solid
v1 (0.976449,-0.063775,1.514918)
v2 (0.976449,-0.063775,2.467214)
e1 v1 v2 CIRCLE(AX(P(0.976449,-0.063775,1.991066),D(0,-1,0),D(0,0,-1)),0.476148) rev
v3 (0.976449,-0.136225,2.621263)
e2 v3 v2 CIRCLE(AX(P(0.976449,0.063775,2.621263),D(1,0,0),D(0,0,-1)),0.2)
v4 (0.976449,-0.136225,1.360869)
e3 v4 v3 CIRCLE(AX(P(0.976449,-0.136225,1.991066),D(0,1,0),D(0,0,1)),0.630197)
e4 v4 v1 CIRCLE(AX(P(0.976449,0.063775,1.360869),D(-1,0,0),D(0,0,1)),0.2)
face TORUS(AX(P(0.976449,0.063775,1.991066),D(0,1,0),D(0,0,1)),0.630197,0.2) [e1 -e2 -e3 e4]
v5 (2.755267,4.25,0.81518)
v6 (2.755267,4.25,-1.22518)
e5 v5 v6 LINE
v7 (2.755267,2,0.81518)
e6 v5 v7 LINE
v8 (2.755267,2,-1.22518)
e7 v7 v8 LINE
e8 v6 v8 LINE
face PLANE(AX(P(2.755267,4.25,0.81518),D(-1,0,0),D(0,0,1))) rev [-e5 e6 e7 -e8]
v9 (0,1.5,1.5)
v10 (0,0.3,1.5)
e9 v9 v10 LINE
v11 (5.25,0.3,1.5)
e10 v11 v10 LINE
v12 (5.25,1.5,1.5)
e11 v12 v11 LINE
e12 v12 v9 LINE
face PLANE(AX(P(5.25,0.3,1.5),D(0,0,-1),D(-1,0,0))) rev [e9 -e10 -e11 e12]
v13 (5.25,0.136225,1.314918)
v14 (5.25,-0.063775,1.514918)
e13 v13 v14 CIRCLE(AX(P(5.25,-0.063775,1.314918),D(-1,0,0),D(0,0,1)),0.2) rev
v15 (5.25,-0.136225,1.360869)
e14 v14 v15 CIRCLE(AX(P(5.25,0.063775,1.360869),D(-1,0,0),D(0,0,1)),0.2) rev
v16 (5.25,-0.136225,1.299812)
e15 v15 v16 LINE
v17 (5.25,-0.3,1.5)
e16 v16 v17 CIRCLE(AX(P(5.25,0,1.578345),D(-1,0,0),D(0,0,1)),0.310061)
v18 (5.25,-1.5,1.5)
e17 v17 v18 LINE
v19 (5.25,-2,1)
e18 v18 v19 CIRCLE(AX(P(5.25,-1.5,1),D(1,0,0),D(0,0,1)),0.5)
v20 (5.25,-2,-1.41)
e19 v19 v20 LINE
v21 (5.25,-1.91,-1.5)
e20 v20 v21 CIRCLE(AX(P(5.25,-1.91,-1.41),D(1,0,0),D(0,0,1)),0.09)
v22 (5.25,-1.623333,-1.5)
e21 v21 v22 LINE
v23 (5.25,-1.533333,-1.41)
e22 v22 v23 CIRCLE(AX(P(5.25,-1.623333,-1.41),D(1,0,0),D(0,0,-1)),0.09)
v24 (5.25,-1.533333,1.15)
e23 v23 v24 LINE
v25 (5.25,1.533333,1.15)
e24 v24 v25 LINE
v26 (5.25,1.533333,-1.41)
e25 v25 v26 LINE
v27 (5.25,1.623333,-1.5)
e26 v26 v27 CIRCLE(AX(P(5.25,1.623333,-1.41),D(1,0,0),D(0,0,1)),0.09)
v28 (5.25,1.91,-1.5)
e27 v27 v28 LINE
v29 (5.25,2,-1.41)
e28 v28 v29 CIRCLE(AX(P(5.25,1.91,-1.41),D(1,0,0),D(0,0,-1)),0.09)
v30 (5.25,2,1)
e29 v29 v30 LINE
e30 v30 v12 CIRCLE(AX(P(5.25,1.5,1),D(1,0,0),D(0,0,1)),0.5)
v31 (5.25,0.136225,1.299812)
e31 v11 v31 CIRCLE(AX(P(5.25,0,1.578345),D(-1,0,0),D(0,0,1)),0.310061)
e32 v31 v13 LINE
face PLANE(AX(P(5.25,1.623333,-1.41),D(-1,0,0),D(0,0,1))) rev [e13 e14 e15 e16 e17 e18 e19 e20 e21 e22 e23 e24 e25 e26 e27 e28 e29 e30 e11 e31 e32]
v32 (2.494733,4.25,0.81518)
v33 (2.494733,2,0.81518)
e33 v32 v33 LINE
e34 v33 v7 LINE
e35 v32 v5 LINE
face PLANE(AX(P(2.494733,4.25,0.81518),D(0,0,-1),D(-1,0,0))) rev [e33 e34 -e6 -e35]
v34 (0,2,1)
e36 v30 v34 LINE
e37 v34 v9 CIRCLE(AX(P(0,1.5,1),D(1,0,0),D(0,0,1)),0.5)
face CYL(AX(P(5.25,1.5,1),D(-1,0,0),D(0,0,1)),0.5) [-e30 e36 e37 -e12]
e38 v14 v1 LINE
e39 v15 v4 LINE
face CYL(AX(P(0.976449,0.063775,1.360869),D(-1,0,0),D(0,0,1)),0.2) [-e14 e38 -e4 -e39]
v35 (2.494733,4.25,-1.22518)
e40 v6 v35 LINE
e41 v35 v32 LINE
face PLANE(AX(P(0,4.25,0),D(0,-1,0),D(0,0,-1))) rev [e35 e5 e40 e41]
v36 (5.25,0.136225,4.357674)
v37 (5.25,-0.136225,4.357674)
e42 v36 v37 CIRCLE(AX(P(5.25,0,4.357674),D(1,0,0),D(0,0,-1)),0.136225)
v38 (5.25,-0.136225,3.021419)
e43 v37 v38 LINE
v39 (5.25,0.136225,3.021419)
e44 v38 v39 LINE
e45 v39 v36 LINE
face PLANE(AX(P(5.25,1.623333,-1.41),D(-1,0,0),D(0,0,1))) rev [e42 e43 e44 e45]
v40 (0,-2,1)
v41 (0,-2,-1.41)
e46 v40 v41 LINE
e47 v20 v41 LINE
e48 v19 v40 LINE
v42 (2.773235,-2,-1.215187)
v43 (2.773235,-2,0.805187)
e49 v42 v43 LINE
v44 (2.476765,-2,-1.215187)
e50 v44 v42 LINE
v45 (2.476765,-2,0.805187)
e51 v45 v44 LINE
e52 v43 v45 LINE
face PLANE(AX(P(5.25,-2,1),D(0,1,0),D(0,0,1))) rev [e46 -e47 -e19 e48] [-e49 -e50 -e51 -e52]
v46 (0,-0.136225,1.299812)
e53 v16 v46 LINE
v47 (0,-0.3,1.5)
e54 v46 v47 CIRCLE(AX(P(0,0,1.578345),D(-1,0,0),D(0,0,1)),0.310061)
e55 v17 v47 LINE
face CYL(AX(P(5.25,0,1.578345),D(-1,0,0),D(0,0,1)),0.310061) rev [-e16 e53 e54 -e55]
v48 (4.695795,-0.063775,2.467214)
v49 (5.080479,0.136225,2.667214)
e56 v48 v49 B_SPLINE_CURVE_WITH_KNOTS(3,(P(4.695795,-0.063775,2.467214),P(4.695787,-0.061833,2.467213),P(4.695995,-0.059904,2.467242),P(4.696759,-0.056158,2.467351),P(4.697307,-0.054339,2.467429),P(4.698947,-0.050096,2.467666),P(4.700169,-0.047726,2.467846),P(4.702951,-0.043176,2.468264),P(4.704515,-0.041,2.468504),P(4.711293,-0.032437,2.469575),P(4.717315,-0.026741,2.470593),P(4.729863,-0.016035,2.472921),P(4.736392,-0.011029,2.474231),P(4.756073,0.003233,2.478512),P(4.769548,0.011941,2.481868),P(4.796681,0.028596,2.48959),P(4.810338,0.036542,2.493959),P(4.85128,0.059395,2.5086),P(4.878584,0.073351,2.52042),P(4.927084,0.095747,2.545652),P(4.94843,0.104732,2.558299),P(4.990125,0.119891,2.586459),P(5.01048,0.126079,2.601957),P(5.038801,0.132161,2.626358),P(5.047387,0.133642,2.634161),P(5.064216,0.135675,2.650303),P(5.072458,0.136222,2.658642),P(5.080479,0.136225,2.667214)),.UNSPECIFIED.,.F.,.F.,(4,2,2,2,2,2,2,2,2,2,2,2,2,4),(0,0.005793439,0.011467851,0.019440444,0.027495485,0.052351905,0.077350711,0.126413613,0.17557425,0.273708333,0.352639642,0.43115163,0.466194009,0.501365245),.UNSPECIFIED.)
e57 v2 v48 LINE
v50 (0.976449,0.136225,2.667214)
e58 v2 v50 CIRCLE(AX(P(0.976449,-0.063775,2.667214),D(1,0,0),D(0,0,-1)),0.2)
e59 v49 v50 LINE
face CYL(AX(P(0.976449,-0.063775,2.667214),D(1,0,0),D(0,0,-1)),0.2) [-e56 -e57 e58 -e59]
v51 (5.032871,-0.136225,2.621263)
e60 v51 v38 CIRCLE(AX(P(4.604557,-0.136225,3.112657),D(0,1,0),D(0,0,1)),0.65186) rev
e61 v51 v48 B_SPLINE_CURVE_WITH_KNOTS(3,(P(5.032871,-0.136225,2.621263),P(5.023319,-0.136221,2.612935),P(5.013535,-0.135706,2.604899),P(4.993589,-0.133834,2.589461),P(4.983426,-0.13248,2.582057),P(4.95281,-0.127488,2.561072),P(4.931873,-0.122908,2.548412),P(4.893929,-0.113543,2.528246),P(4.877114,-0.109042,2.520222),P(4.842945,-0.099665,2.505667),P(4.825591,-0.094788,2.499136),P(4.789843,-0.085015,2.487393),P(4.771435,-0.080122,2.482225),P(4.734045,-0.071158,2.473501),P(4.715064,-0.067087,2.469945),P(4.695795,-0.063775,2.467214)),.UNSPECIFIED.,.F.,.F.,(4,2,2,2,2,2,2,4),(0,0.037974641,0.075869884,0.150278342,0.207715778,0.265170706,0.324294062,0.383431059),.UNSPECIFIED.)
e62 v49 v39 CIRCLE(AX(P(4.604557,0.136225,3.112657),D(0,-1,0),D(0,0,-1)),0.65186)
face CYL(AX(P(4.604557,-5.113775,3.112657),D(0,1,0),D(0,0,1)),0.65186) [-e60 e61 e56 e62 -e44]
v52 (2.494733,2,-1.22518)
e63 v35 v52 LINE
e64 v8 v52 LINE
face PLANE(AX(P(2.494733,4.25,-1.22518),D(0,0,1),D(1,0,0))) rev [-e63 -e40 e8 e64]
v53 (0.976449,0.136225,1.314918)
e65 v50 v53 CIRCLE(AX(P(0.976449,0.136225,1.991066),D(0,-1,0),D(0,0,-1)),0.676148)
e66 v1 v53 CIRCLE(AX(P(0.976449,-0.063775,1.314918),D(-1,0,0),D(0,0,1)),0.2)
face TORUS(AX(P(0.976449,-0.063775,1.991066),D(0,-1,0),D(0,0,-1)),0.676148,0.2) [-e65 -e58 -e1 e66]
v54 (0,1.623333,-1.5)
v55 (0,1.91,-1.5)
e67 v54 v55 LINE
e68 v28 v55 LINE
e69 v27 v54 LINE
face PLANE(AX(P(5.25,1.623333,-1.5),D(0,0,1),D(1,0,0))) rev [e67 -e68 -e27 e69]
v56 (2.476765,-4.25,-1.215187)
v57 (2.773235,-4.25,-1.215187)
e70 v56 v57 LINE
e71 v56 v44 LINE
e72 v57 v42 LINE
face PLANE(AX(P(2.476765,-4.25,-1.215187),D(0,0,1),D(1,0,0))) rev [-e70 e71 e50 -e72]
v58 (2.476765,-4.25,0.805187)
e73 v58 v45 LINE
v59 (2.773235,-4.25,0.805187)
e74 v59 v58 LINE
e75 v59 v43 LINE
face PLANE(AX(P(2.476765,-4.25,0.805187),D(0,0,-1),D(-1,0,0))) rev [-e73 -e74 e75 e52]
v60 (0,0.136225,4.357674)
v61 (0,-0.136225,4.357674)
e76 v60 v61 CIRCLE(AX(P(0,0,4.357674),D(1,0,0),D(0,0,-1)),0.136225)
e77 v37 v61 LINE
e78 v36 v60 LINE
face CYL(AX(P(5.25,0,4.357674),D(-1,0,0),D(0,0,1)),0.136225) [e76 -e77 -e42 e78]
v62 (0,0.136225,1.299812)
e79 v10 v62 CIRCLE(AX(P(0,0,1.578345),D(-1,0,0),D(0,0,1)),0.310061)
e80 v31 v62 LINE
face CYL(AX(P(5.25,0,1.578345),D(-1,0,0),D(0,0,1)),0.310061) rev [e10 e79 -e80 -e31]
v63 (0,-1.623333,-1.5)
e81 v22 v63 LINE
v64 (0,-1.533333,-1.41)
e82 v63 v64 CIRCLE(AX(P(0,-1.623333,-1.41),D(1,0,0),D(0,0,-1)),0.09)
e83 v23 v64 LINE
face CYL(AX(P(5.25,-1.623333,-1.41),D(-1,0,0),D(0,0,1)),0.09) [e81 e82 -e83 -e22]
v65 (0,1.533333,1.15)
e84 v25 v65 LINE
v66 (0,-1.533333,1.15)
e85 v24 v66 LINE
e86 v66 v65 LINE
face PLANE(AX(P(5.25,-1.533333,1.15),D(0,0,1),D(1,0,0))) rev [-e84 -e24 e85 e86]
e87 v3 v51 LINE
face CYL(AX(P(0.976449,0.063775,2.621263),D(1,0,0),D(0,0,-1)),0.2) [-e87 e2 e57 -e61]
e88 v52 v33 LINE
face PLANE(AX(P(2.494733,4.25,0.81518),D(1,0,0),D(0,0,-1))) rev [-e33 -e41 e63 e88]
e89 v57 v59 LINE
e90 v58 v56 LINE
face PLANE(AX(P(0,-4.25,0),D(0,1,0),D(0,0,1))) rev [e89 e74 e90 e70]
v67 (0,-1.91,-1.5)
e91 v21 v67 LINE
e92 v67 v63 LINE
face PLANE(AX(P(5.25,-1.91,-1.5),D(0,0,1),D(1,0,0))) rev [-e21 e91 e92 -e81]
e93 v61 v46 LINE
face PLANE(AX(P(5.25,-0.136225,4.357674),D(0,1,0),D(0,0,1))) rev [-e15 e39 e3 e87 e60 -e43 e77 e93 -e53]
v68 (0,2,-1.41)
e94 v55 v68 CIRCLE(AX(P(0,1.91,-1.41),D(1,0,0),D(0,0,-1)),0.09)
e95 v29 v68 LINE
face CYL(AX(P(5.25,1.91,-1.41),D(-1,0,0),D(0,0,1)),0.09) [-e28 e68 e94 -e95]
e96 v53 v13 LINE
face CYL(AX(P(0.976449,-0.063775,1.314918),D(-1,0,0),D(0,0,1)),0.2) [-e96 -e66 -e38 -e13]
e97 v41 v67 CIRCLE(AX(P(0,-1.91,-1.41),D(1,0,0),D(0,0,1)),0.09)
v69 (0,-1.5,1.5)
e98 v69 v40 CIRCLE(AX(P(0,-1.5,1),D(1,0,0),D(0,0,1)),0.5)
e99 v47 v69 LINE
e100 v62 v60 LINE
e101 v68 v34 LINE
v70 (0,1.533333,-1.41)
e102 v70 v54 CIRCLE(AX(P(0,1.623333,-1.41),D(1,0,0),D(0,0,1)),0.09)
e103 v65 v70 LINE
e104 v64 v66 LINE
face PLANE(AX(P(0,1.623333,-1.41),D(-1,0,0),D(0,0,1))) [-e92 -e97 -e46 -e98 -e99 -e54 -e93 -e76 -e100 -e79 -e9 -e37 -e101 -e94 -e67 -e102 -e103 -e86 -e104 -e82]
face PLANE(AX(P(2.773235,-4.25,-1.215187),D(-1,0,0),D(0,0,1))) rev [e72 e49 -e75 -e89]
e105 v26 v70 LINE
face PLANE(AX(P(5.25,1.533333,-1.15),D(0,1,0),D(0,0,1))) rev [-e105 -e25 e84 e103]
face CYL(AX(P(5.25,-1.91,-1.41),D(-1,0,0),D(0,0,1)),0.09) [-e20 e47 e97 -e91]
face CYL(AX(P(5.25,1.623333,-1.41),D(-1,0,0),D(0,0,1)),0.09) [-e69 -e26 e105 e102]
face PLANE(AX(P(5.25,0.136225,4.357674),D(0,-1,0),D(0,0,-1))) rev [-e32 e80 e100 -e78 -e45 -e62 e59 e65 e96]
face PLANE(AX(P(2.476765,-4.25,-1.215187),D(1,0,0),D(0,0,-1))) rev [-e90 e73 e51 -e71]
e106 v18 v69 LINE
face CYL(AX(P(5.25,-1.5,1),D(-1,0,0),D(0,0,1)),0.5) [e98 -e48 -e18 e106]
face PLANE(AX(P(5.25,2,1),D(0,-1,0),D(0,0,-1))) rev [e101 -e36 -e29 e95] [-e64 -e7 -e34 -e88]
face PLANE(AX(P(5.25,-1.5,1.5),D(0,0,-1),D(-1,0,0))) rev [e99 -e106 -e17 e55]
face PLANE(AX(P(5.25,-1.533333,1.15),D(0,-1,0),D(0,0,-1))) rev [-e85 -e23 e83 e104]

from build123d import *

# Parameters (mm, degrees)
RESSALTO_EXTRUS_O1_DEPTH = 5.25
CORTE_EXTRUS_O1_DEPTH    = 5.25
CORTE_EXTRUS_O2_DEPTH    = 5.25
FILETE1_R                = 0.2
FILETE2_R                = 0.2
ESBO_O5_W                = 0.260533882
ESBO_O5_H                = 2.040360402
RESSALTO_EXTRUS_O2_DEPTH = 2.25
ESBO_O6_W                = 0.29646959
ESBO_O6_H                = 2.02037459
RESSALTO_EXTRUS_O3_DEPTH = 2.25


with BuildPart() as part:
    # Esboço1 → Ressalto-extrusão1 (new body)
    with BuildSketch(Plane(origin=(0, 0, 0), x_dir=(0, 0, -1), z_dir=(1, 0, 0))):
        with BuildLine():
            Line((1.15, 1.533333333), (1.41, 1.533333333))
            ThreePointArc((1.41, 1.533333333), (1.47363961, 1.559693723), (1.5, 1.623333333))
            Line((1.5, 1.623333333), (1.5, 1.91))
            ThreePointArc((1.5, 1.91), (1.47363961, 1.97363961), (1.41, 2))
            Line((1.41, 2), (-1, 2))
            ThreePointArc((-1, 2), (-1.353553391, 1.853553391), (-1.5, 1.5))
            Line((-1.5, 1.5), (-1.5, 0.3))
            ThreePointArc((-1.5, 0.3), (-1.382013537, 0.239983106), (-1.299811944, 0.136225065))
            Line((-1.299811944, 0.136225065), (-4.357674279, 0.136225065))
            ThreePointArc((-4.357674279, 0.136225065), (-4.493899344, 0), (-4.357674279, -0.136225065))
            Line((-4.357674279, -0.136225065), (-1.299811944, -0.136225065))
            ThreePointArc((-1.299811944, -0.136225065), (-1.382013537, -0.239983106), (-1.5, -0.3))
            Line((-1.5, -0.3), (-1.5, -1.5))
            ThreePointArc((-1.5, -1.5), (-1.353553391, -1.853553391), (-1, -2))
            Line((-1, -2), (1.41, -2))
            ThreePointArc((1.41, -2), (1.47363961, -1.97363961), (1.5, -1.91))
            Line((1.5, -1.91), (1.5, -1.623333333))
            ThreePointArc((1.5, -1.623333333), (1.47363961, -1.559693723), (1.41, -1.533333333))
            Line((1.41, -1.533333333), (1.15, -1.533333333))
            Line((1.15, -1.533333333), (-1.15, -1.533333333))
            Line((-1.15, -1.533333333), (-1.15, 1.533333333))
            Line((-1.15, 1.533333333), (1.15, 1.533333333))
        make_face()
    extrude(amount=RESSALTO_EXTRUS_O1_DEPTH)

    # Esboço3 → Corte-extrusão1 (cut)
    with BuildSketch(Plane(origin=(0, 0.136225065, 0), x_dir=(1, 0, 0), z_dir=(0, 1, 0))):
        with BuildLine():
            Line((0.9764494, -1.514917526), (7.89407317, -1.514917526))
            ThreePointArc((7.89407317, -1.514917526), (8.3702213, -1.991065656), (7.89407317, -2.467213785))
            Line((7.89407317, -2.467213785), (0.9764494, -2.467213785))
            ThreePointArc((0.9764494, -2.467213785), (0.500301271, -1.991065656), (0.9764494, -1.514917526))
        make_face()
    extrude(amount=-CORTE_EXTRUS_O1_DEPTH, mode=Mode.SUBTRACT)

    # Esboço4 → Corte-extrusão2 (cut)
    with BuildSketch(Plane(origin=(0, 0.136225065, 0), x_dir=(1, 0, 0), z_dir=(0, 1, 0))):
        with BuildLine():
            Line((4.695795168, -2.467213785), (4.884457634, -1.937162094))
            Line((4.884457634, -1.937162094), (6.007448506, -2.098872779))
            Line((6.007448506, -2.098872779), (6.375789512, -3.266783286))
            Line((6.375789512, -3.266783286), (5.25, -3.203895797))
            ThreePointArc((5.25, -3.203895797), (5.125469424, -2.720775212), (4.695795168, -2.467213785))
        make_face()
    extrude(amount=-CORTE_EXTRUS_O2_DEPTH, mode=Mode.SUBTRACT)

    # Filete1
    filete1_edges = [part.edges().sort_by_distance(p)[0] for p in [
        (2.836122284, 0.136225065, 2.467213785),
        (3.1132247, 0.136225065, 1.514917526),
        (0.500301271, 0.136225065, 1.991065656),
    ]]
    fillet(filete1_edges, radius=FILETE1_R)

    # Filete2
    # the kernel refuses this fillet: 0.2 mm, written as the material it takes off along each edge
    with BuildSketch(Plane(origin=(5.080917151, -0.136225065, 2.467213785), x_dir=(0, 0, 1), z_dir=(-1, 0, 0))) as filete2_piece_1:
        with BuildLine():
            CenterArc((0.154048793, 0.2), FILETE2_R, 219.624198081, 50.375801919)
            Line((0, 0.07245013), (-0.003080976, 0.069899133))
            ThreePointArc((-0.003080976, 0.069899133), (-0.004, 0.036225065), (-0.004, 0))
            Line((-0.004, 0), (0, -0.004))
            Line((0, -0.004), (0.154048793, -0.004))
            Line((0.154048793, -0.004), (0.154048793, 0))
        make_face()
    extrude(amount=4.104467751, mode=Mode.SUBTRACT)
    with BuildSketch(Plane(origin=(0.9764494, -0.136225065, 1.991065656), x_dir=(0, 0, -1), z_dir=(1, 0, 0))) as filete2_piece_2:
        with BuildLine():
            CenterArc((0.630196923, 0.2), FILETE2_R, 219.624198081, 50.375801919)
            Line((0.47614813, 0.07245013), (0.473067154, 0.069899133))
            ThreePointArc((0.473067154, 0.069899133), (0.47214813, 0.036225065), (0.47214813, 0))
            Line((0.47214813, 0), (0.47614813, -0.004))
            Line((0.47614813, -0.004), (0.630196923, -0.004))
            Line((0.630196923, -0.004), (0.630196923, 0))
        make_face()
    revolve(axis=Axis((0.9764494, -0.136225065, 1.991065656), (0, 1, 0)), revolution_arc=180, mode=Mode.SUBTRACT)
    with BuildSketch(Plane(origin=(0.9764494, -0.136225065, 1.514917526), x_dir=(0, 1, 0), z_dir=(1, 0, 0))) as filete2_piece_3:
        with BuildLine():
            CenterArc((0.2, -0.154048793), FILETE2_R, 129.624198081, 50.375801919)
            Line((0, -0.154048793), (-0.004, -0.154048793))
            Line((-0.004, -0.154048793), (-0.004, 0))
            Line((-0.004, 0), (0, 0.004))
            ThreePointArc((0, 0.004), (0.036225065, 0.004), (0.069899133, 0.003080976))
            Line((0.069899133, 0.003080976), (0.07245013, 0))
        make_face()
    extrude(amount=4.658672583, mode=Mode.SUBTRACT)

    # Esboço5 → Ressalto-extrusão2 (add)
    with BuildSketch(Plane(origin=(0, 2, 0), x_dir=(1, 0, 0), z_dir=(0, 1, 0))):
        with Locations((2.625, 0.205)):
            Rectangle(ESBO_O5_W, ESBO_O5_H)
    extrude(amount=RESSALTO_EXTRUS_O2_DEPTH)

    # Esboço6 → Ressalto-extrusão3 (add)
    with BuildSketch(Plane.XZ.offset(2)):
        with Locations((2.625, -0.205)):
            Rectangle(ESBO_O6_W, ESBO_O6_H)
    extrude(amount=RESSALTO_EXTRUS_O3_DEPTH)


solid = part.part
